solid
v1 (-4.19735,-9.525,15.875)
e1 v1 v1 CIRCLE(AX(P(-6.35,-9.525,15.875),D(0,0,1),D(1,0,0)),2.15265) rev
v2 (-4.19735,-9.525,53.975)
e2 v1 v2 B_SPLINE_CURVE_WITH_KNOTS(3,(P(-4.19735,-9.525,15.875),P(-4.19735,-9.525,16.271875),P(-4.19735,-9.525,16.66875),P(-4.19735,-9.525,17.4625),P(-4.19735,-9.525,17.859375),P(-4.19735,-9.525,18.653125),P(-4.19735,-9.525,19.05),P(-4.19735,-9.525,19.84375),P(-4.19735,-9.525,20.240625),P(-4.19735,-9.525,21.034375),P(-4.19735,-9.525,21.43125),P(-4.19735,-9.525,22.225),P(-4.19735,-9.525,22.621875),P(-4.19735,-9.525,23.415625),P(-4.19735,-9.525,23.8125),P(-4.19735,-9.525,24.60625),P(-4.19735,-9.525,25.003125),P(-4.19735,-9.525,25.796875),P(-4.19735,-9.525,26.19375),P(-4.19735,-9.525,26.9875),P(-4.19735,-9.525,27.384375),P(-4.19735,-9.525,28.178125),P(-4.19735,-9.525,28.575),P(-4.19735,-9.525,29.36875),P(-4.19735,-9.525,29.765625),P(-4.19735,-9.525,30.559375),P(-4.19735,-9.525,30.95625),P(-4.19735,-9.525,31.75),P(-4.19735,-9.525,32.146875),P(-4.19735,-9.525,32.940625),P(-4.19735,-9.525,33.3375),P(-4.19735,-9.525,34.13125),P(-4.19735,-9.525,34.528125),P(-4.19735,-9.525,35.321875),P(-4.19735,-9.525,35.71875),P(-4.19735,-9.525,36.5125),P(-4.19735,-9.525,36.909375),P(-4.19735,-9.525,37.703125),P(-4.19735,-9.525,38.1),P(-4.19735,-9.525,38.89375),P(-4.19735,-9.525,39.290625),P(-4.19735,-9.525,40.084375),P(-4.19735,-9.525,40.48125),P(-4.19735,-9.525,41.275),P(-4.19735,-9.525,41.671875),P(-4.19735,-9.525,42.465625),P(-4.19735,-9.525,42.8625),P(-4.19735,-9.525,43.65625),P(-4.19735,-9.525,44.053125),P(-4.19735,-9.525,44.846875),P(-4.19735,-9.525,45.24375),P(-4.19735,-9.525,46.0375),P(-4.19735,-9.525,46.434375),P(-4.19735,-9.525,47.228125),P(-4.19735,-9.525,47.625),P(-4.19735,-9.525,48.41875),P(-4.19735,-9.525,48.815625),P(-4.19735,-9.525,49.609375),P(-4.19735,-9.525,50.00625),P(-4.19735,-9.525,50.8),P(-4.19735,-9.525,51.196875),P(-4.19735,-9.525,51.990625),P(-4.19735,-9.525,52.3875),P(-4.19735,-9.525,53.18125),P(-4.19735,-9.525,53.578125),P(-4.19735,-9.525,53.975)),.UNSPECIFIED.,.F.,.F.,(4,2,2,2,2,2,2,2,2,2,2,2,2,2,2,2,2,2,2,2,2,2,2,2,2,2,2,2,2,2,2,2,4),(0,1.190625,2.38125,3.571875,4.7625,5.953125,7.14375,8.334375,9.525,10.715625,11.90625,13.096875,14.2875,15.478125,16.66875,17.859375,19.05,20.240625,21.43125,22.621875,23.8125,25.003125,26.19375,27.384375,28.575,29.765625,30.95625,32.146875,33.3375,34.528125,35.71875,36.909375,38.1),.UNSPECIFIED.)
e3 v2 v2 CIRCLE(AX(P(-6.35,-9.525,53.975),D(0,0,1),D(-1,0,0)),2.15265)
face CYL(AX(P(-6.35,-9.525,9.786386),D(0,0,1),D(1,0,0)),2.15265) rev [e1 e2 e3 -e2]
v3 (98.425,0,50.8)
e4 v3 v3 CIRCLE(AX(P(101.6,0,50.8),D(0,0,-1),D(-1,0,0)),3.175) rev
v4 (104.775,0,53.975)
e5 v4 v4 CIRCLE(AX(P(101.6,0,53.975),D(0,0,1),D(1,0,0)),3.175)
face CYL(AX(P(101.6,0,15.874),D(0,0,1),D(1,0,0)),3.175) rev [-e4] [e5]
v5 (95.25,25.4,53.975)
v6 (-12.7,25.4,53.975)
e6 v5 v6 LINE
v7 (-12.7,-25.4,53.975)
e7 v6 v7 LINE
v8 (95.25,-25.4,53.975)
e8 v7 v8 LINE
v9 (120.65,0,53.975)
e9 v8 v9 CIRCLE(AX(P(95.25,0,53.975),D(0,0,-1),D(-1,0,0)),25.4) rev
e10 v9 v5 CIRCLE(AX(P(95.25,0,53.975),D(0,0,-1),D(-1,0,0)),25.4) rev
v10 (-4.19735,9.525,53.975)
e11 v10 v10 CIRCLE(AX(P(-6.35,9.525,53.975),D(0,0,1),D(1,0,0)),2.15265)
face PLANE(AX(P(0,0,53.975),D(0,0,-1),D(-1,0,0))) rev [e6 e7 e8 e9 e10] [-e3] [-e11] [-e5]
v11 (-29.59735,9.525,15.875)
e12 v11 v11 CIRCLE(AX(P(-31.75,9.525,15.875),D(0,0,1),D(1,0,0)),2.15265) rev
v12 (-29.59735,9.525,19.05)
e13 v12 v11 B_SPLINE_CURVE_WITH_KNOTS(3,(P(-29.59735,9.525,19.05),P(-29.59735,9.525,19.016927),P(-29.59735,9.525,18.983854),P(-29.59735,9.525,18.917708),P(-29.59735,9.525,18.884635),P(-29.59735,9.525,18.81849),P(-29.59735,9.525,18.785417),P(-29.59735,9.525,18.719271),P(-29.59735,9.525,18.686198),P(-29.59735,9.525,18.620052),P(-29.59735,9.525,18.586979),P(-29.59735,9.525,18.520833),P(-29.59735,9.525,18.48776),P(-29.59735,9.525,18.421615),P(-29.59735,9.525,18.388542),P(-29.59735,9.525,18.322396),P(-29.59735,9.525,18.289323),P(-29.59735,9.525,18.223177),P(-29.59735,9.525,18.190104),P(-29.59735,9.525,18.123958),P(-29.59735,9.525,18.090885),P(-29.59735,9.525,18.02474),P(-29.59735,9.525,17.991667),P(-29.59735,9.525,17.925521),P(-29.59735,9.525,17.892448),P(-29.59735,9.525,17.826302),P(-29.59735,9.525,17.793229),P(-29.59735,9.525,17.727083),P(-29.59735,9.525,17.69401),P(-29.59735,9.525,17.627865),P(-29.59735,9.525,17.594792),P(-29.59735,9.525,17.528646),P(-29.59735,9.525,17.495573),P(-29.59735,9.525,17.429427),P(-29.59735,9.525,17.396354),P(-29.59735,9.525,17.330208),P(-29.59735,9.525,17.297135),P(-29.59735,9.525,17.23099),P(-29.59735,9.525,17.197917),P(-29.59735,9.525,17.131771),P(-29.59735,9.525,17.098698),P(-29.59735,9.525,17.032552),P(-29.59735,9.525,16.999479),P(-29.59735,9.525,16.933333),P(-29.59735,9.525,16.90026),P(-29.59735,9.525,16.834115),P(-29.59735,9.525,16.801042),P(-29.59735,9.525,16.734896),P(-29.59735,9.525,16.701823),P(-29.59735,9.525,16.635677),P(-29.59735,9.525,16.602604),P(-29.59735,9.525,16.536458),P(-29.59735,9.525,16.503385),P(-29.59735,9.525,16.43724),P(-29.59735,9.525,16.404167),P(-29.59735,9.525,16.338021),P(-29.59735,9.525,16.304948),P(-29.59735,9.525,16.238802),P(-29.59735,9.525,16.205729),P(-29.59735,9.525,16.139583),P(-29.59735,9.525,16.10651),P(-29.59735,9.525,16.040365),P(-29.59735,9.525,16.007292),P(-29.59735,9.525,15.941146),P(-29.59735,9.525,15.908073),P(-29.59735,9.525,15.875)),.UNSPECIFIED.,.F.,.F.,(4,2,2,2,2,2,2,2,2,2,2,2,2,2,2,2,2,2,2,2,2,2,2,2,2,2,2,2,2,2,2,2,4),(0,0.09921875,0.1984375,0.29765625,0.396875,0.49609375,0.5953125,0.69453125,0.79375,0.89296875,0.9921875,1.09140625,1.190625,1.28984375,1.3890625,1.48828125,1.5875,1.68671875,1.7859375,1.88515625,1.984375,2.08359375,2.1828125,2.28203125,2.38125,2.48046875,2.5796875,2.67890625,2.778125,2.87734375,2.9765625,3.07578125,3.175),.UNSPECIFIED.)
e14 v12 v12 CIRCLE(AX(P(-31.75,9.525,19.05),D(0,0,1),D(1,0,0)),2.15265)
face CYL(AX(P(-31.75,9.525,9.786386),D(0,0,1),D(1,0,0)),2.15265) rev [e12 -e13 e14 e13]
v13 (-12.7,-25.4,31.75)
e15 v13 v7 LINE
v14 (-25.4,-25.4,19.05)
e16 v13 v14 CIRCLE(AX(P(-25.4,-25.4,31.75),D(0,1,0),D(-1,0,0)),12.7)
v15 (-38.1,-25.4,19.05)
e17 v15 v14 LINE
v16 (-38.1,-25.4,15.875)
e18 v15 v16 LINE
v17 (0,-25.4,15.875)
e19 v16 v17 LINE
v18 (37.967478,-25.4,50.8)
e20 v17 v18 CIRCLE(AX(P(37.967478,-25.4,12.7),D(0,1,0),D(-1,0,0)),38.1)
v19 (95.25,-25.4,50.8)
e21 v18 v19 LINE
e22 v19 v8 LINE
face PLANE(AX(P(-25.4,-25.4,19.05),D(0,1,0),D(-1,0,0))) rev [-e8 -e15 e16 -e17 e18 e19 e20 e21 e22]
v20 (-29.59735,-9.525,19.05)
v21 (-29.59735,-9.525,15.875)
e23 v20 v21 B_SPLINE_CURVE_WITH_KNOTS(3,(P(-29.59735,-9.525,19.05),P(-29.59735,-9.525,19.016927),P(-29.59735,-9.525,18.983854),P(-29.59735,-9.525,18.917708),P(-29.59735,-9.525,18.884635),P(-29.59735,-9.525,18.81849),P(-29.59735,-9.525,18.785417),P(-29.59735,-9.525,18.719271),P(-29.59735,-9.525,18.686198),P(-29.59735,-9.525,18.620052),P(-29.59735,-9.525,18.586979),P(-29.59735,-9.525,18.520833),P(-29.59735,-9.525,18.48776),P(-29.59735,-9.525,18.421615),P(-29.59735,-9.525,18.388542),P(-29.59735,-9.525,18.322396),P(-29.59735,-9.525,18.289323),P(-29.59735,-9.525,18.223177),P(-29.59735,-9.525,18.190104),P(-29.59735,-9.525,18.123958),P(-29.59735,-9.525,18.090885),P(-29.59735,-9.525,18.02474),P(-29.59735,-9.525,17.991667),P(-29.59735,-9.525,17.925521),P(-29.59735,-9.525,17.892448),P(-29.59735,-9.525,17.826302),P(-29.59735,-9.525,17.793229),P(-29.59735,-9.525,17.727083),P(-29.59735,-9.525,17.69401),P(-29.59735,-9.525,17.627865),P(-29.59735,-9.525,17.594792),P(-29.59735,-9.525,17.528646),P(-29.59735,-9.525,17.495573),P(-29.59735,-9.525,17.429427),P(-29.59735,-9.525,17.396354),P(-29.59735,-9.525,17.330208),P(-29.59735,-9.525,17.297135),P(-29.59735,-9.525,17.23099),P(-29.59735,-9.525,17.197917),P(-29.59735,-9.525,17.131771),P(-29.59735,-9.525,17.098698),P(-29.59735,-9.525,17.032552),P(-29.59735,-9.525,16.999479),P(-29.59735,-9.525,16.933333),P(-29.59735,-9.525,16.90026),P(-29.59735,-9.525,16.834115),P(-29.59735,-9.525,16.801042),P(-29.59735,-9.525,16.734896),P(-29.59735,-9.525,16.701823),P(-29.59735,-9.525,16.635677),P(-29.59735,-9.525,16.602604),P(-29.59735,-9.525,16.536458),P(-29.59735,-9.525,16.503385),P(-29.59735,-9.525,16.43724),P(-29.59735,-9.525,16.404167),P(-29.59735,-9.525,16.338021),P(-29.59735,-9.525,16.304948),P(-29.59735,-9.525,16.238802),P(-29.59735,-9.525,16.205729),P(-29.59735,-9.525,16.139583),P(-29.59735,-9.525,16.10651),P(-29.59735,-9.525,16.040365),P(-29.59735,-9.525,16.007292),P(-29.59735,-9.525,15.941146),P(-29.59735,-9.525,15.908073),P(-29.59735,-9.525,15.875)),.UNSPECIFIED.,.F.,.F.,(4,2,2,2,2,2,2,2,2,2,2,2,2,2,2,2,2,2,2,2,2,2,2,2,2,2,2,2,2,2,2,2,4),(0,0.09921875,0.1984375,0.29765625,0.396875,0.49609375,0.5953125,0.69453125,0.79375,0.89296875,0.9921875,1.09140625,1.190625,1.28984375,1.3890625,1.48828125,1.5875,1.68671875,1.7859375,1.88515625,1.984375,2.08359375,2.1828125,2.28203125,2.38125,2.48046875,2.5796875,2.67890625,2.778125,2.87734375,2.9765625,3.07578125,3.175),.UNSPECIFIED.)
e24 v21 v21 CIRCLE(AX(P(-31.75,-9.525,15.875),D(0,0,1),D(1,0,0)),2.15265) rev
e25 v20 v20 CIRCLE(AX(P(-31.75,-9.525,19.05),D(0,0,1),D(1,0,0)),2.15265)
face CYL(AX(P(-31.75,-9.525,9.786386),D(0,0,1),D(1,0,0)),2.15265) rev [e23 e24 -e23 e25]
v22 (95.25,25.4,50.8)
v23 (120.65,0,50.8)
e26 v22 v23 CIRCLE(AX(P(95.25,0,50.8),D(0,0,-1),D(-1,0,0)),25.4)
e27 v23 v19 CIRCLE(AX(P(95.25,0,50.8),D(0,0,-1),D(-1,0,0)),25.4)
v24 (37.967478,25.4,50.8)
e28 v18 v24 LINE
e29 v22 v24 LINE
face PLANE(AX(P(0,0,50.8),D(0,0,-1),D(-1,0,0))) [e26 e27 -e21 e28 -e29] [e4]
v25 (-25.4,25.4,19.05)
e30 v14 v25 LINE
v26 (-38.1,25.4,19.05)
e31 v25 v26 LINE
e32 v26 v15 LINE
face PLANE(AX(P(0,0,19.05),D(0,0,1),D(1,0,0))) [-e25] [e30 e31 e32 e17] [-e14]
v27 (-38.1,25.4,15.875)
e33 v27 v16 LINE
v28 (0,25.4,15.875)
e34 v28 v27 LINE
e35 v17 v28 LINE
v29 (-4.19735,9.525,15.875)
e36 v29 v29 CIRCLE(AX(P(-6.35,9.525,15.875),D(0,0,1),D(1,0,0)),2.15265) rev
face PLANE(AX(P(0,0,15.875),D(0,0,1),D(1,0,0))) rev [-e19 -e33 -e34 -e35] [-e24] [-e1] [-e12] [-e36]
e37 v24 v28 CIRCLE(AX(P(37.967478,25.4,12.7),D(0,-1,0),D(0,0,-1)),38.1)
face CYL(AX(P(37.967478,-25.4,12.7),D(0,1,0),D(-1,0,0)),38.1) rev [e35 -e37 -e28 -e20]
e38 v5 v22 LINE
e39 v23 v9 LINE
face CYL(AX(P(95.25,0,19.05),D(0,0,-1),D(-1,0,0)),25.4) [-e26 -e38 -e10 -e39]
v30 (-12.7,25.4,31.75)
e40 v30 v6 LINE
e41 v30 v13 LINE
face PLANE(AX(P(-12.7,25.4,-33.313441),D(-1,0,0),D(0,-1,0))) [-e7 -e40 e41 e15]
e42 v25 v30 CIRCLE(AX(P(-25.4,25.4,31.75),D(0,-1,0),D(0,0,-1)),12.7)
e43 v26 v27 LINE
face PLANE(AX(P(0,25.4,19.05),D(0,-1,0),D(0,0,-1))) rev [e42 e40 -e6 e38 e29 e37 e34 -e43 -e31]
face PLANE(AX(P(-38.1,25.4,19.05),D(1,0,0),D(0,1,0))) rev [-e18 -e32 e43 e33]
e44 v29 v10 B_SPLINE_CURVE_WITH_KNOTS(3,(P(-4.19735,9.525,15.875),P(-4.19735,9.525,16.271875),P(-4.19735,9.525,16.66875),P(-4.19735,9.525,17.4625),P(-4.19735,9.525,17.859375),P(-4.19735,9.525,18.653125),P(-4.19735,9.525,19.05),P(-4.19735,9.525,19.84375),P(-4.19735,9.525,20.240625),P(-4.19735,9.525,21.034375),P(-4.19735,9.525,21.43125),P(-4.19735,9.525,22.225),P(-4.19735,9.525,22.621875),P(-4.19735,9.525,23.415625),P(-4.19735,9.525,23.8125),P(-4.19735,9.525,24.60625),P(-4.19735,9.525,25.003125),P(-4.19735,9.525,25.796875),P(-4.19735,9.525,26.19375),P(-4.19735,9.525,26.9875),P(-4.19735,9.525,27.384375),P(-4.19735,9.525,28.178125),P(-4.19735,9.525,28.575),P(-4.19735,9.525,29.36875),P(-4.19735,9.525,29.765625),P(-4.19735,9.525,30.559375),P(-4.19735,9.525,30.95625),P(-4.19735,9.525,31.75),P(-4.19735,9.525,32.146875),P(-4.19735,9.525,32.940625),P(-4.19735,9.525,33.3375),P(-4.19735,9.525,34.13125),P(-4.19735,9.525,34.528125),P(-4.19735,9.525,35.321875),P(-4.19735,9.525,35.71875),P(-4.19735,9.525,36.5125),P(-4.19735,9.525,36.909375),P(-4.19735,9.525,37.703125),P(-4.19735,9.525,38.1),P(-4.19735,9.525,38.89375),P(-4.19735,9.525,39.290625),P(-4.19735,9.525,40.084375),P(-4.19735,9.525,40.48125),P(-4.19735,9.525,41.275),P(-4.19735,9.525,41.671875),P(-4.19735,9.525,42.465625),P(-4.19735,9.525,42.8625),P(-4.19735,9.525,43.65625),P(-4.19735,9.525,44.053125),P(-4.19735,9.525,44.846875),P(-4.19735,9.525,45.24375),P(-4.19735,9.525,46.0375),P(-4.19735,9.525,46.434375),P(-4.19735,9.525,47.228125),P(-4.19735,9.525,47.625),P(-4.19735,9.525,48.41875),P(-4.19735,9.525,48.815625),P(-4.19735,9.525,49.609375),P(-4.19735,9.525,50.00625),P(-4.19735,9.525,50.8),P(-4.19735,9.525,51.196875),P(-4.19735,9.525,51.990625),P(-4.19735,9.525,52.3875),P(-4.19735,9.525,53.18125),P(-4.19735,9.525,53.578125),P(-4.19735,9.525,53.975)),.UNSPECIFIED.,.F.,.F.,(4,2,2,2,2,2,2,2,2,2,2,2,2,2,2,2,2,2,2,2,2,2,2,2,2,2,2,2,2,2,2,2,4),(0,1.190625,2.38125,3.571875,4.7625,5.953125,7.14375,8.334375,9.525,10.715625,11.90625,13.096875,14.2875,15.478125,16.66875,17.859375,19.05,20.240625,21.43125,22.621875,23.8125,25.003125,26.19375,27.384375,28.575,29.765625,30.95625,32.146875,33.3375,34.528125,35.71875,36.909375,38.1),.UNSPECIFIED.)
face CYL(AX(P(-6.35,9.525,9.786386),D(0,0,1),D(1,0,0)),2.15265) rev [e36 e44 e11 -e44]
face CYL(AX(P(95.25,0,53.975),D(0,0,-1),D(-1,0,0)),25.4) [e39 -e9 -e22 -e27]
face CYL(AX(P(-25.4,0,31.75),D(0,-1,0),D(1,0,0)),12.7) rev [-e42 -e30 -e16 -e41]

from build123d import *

# Parameters (mm, degrees)
BOSS_EXTRUDE1_DEPTH = 3.175
SKETCH2_W           = 12.7
SKETCH2_H           = 50.8
BOSS_EXTRUDE2_DEPTH = 31.75
FILLET1_R           = 12.7
BOSS_EXTRUDE3_DEPTH = 3.175
FILLET2_R           = 38.1
SKETCH4_R           = 2.15265
CUT_EXTRUDE1_DEPTH  = 38.1
FILLET3_R           = 25.4
CUT_EXTRUDE4_REACH  = 131.047
SKETCH7_R           = 3.175


# Some blends are built 0.0001 mm under size
with BuildPart() as part:
    # Sketch1 → Boss-Extrude1 (new body)
    with BuildSketch(Plane.XY.offset(15.875)):
        Polygon((-38.1, 25.4), (-38.1, -25.4), (-25.4, -25.4), (0, -25.4), (0, 25.4), align=None)
    extrude(amount=BOSS_EXTRUDE1_DEPTH)

    # Sketch2 → Boss-Extrude2 (add)
    with BuildSketch(Plane.XY.offset(50.8)):
        with Locations((-6.35, 0)):
            Rectangle(SKETCH2_W, SKETCH2_H)
    extrude(amount=-BOSS_EXTRUDE2_DEPTH)

    # Fillet1
    fillet1_edges = [part.edges().sort_by_distance(p)[0] for p in [
        (-12.7, 0, 19.05),
    ]]
    fillet(fillet1_edges, radius=FILLET1_R)

    # Sketch3 → Boss-Extrude3 (add)
    with BuildSketch(Plane.XY.offset(50.8)):
        Polygon((0, 25.4), (101.6, 25.4), (120.65, 25.4), (120.65, -25.4), (0, -25.4), (-12.7, -25.4), (-12.7, 25.4), align=None)
    extrude(amount=BOSS_EXTRUDE3_DEPTH)

    # Fillet2
    # the kernel refuses this fillet: 38.1 mm, written as the material it adds along each edge
    with BuildSketch(Plane(origin=(0, -25.4, 50.8), x_dir=(0, 0, -1), z_dir=(0, 1, 0))) as fillet2_piece_1:
        with BuildLine():
            CenterArc((38.1, -37.967477859), FILLET2_R, 94.780191847, 85.219808153)
            Line((0, -37.967477859), (-0.762, -37.967477859))
            Line((-0.762, -37.967477859), (-0.762, 0))
            Line((-0.762, 0), (0, 0.762))
            ThreePointArc((0, 0.762), (17.4625, 0.762), (34.8615, 0.759349557))
            Line((34.8615, 0.759349557), (34.925, 0))
        make_face()
    extrude(amount=50.8)

    # Sketch4 → Cut-Extrude1 (cut)
    with BuildSketch(Plane.XY.offset(53.975)):
        with Locations((-6.35, 9.525)):
            Circle(SKETCH4_R)
        with Locations((-31.75, 9.525)):
            Circle(SKETCH4_R)
        with Locations((-6.35, -9.525)):
            Circle(SKETCH4_R)
        with Locations((-31.75, -9.525)):
            Circle(SKETCH4_R)
    extrude(amount=-CUT_EXTRUDE1_DEPTH, mode=Mode.SUBTRACT)

    # Fillet3
    fillet3_edges = [part.edges().sort_by_distance(p)[0] for p in [
        (120.65, -25.4, 52.3875),
        (120.65, 25.4, 52.3875),
    ]]
    fillet(fillet3_edges, radius=FILLET3_R - 0.0001)  # a hair under: the kernel refuses the full size

    # Sketch7 → Cut-Extrude4 (cut, up to next)
    with BuildSketch(Plane.XY.offset(53.975), mode=Mode.PRIVATE) as cut_extrude4_sk1:
        with Locations((101.6, 0)):
            Circle(SKETCH7_R)
    cut_extrude4_tool1 = extrude(cut_extrude4_sk1.sketch, amount=-CUT_EXTRUDE4_REACH, mode=Mode.PRIVATE) & part.part
    add(cut_extrude4_tool1.solids().sort_by_distance((101.6, 0, 53.975))[0], mode=Mode.SUBTRACT)


solid = part.part
